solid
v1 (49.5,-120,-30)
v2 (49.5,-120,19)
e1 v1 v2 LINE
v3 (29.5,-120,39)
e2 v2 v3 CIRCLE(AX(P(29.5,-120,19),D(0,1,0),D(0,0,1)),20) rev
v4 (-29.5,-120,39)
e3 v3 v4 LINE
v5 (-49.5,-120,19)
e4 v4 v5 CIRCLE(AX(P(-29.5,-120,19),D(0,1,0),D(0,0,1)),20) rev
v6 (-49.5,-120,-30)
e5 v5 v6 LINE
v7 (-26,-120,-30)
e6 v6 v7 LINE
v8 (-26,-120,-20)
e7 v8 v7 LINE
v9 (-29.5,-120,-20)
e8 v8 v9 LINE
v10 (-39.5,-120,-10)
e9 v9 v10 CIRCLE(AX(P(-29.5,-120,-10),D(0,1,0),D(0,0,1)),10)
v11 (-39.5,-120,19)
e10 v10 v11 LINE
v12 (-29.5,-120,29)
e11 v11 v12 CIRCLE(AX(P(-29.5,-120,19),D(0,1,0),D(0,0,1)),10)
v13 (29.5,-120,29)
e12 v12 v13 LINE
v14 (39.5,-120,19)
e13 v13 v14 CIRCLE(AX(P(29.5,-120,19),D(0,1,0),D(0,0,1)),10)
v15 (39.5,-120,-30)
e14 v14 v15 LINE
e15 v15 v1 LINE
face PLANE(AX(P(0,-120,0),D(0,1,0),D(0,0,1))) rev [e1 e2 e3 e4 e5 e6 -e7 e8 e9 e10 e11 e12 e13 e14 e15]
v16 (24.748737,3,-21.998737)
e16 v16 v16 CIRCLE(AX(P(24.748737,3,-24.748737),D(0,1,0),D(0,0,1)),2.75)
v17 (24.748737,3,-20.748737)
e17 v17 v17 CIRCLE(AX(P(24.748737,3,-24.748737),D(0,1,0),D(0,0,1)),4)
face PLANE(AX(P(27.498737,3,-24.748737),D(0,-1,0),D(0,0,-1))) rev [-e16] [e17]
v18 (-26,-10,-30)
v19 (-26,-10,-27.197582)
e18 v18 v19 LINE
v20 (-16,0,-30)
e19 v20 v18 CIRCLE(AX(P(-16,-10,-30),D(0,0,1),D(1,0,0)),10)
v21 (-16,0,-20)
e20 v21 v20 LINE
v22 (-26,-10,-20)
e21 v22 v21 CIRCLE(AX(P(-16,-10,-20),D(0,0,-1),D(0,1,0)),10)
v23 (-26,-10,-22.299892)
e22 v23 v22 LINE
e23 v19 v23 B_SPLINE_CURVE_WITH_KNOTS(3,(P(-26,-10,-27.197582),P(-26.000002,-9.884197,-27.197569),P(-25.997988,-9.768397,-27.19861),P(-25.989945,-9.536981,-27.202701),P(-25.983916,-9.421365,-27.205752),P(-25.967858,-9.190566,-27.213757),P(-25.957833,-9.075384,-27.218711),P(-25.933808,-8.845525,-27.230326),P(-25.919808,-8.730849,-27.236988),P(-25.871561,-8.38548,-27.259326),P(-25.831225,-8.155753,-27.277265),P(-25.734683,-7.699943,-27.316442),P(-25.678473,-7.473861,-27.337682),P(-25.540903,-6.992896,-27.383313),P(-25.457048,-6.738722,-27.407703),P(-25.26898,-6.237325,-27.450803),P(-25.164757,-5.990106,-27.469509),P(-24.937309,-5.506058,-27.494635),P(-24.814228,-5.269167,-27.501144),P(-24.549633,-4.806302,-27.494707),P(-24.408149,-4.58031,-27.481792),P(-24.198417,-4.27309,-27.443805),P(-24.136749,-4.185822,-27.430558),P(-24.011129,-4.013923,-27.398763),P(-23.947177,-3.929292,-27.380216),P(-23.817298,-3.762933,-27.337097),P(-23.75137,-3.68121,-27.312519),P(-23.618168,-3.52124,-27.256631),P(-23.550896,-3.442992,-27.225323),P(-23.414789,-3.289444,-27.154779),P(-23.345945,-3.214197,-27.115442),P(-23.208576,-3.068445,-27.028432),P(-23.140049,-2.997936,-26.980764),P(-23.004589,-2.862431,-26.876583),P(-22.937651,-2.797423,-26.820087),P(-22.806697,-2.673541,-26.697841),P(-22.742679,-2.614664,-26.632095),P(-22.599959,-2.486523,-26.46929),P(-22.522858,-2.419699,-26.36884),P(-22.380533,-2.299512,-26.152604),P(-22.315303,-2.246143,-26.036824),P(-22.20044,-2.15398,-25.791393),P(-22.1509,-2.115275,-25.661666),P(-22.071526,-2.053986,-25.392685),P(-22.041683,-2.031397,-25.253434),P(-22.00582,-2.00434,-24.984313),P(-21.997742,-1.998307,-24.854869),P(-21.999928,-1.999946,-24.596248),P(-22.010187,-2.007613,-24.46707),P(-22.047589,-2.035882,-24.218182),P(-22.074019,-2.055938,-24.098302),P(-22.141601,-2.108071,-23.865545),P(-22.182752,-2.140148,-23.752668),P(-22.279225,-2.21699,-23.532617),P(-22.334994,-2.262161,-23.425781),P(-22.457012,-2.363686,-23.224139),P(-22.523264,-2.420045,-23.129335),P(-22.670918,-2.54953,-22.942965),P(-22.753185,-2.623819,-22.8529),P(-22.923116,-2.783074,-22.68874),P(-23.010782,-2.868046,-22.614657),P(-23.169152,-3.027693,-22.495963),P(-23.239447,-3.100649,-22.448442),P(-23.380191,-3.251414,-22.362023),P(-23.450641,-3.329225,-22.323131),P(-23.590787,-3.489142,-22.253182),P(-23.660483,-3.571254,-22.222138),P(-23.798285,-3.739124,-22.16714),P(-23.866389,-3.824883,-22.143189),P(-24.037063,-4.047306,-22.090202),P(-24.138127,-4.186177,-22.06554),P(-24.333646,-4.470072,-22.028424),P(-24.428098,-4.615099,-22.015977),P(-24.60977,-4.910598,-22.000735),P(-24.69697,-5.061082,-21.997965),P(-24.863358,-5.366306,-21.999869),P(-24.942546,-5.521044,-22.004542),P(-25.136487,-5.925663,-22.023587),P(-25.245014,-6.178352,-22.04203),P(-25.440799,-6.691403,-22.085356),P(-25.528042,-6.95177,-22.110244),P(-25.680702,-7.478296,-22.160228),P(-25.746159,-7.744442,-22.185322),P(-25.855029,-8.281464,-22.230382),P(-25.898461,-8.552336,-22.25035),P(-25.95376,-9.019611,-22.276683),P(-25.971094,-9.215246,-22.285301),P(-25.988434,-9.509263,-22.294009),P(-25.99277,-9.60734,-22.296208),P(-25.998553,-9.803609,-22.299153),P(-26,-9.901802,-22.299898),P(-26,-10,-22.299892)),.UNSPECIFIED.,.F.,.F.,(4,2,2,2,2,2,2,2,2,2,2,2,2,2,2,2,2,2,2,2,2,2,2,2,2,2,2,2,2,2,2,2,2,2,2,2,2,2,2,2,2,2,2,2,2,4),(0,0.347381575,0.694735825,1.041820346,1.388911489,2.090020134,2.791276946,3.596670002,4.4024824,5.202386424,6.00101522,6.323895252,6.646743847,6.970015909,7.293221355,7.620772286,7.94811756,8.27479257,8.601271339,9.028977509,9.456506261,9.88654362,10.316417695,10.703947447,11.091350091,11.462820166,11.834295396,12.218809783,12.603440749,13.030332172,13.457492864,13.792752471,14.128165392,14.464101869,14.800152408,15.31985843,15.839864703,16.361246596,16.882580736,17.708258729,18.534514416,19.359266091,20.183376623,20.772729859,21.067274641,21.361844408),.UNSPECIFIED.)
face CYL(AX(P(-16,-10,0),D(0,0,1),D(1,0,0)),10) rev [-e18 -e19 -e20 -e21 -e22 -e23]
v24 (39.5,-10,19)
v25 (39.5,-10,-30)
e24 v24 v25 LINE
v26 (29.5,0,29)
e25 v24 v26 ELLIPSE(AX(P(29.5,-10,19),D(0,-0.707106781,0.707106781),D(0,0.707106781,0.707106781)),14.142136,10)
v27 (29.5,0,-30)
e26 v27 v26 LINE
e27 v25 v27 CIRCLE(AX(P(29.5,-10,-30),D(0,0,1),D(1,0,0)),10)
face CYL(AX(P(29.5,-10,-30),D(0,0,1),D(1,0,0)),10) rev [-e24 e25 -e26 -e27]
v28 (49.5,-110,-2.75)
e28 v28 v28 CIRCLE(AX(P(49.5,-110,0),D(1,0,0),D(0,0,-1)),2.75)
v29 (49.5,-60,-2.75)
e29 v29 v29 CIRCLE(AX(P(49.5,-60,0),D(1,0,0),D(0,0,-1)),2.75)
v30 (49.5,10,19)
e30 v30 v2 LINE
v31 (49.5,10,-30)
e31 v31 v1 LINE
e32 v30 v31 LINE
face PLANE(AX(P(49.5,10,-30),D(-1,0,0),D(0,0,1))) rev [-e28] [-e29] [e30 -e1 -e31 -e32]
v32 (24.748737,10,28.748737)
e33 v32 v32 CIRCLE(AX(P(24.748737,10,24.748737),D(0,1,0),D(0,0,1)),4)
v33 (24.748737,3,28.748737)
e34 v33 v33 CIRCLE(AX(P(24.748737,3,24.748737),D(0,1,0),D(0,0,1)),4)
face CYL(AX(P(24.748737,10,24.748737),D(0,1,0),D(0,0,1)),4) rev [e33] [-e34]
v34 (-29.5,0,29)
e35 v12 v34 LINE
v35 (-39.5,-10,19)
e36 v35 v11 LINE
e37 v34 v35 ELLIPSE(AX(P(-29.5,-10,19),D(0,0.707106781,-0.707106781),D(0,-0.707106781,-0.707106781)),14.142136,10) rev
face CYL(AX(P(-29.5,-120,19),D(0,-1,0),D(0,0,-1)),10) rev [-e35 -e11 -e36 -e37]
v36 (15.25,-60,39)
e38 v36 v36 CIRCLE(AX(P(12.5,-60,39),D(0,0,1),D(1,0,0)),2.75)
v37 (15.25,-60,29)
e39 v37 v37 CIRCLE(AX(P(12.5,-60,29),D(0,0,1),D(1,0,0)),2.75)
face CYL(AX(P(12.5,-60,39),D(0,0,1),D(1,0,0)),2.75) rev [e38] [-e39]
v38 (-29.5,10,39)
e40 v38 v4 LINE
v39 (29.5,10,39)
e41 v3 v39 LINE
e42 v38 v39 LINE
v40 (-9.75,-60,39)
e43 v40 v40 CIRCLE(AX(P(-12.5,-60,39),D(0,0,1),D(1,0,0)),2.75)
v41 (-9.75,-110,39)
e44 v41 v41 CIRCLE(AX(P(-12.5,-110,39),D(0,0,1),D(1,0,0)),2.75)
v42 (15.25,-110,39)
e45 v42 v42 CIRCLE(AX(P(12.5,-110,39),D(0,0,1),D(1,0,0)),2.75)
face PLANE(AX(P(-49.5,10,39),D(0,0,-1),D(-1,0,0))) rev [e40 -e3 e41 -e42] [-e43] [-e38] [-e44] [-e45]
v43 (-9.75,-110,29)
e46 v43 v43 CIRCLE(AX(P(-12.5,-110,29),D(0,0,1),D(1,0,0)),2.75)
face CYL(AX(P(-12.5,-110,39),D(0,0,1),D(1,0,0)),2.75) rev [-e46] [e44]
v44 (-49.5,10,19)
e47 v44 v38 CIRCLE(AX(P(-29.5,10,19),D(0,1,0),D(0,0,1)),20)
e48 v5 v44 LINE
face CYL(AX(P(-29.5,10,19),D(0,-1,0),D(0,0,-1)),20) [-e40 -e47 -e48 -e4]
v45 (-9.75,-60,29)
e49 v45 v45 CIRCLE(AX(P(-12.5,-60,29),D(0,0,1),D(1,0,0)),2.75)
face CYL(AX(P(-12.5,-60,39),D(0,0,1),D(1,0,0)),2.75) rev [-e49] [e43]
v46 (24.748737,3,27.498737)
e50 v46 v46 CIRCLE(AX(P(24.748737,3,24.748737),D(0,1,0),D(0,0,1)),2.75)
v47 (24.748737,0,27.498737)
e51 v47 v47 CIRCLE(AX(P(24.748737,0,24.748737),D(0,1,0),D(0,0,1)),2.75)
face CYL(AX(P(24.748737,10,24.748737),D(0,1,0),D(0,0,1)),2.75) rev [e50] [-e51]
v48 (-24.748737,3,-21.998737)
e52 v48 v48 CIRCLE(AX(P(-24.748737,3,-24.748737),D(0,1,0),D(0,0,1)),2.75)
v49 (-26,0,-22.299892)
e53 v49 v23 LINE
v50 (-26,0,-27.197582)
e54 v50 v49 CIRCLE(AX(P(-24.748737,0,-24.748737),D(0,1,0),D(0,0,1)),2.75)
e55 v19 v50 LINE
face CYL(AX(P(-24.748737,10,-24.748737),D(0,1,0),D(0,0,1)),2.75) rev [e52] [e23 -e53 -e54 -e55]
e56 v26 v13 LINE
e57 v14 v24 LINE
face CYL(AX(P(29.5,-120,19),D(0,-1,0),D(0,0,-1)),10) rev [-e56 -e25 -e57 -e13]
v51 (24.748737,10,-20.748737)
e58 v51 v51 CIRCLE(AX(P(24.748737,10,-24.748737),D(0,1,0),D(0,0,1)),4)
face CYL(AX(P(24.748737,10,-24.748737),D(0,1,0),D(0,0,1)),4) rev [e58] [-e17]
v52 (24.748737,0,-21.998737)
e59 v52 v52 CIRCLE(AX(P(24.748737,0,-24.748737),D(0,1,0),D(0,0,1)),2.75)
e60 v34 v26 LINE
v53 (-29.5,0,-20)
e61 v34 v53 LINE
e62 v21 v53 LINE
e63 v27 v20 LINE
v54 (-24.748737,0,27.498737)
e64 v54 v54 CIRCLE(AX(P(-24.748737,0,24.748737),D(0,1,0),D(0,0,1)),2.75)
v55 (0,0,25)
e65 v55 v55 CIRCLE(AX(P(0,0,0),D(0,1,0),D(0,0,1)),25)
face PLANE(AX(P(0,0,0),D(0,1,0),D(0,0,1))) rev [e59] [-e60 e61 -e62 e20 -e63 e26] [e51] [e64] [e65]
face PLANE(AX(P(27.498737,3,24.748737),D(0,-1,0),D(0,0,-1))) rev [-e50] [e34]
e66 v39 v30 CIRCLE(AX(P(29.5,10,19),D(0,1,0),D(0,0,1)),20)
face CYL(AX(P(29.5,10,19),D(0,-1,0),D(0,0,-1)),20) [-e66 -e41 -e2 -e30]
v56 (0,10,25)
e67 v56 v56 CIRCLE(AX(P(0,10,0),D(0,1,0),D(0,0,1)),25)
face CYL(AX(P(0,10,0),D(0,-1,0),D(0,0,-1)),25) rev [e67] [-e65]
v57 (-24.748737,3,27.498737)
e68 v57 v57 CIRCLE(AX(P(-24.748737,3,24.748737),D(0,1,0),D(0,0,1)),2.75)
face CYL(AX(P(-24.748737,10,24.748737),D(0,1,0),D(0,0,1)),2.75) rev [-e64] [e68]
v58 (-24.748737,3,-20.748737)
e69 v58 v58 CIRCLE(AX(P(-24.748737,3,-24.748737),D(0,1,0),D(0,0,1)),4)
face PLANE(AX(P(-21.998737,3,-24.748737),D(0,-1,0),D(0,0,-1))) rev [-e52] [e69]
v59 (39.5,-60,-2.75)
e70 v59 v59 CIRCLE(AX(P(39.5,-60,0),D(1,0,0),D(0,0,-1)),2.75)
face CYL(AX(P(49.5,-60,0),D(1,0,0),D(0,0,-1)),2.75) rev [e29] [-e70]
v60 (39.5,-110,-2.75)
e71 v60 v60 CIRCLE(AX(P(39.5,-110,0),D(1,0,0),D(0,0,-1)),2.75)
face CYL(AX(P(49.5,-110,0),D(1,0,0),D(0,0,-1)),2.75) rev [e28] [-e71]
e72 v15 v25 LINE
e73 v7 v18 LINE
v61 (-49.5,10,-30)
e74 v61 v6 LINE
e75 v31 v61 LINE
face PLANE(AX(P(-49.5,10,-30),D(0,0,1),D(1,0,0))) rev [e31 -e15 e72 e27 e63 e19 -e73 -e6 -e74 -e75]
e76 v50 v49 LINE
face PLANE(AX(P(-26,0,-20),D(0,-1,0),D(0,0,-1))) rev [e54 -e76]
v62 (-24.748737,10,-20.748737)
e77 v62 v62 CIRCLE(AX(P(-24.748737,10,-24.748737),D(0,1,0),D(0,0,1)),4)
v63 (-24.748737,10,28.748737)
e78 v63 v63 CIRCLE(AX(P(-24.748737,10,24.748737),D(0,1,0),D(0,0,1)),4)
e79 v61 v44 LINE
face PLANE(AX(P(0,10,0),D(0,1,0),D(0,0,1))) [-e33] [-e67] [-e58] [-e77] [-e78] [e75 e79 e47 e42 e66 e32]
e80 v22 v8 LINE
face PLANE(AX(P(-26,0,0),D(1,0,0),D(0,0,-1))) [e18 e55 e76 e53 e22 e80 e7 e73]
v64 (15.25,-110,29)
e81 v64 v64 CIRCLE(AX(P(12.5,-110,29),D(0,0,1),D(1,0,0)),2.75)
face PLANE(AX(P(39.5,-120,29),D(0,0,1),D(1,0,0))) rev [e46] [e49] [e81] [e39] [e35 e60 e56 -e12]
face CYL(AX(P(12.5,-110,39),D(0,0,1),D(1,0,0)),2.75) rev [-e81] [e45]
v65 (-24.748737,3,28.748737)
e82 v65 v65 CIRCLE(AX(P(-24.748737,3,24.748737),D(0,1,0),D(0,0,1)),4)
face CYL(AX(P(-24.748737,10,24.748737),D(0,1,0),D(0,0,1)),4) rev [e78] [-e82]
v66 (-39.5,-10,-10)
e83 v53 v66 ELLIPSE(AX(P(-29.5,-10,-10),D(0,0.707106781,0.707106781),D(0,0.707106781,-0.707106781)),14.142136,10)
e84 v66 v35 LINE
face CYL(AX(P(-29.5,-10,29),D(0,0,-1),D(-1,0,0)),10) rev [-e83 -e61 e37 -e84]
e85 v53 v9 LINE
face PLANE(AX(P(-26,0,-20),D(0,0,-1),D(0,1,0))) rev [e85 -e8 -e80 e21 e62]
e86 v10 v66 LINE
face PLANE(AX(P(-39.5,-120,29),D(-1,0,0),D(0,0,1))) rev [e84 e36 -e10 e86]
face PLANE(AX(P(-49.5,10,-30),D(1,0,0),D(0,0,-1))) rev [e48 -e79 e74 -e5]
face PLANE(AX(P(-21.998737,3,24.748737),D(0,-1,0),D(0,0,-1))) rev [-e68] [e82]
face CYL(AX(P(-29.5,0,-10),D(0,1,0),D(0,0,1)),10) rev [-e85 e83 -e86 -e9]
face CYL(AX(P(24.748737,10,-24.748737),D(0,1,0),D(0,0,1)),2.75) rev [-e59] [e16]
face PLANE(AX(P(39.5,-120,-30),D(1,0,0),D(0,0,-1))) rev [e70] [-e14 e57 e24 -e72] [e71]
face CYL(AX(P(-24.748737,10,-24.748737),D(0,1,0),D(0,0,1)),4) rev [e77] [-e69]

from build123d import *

# Parameters (mm, degrees)
SKETCH2_W                      = 99
SKETCH2_H                      = 69
SKETCH2_R                      = 25
BOSS_EXTRUDE1_DEPTH            = 10
BOSS_EXTRUDE2_DEPTH            = 120
CBORE_FOR_M5_SHCS1_D           = 5.5
CBORE_FOR_M5_SHCS1_CBORE_D     = 8
CBORE_FOR_M5_SHCS1_CBORE_DEPTH = 7
M5_CLEARANCE_HOLE1_D           = 5.5
M5_CLEARANCE_HOLE2_D           = 5.5
M5_CLEARANCE_HOLE2_DEPTH       = 10
SKETCH11_W                     = 10
SKETCH11_H                     = 120
BOSS_EXTRUDE3_DEPTH            = 13.5
FILLET1_R                      = 20
FILLET2_R                      = 10


with BuildPart() as part:
    # Sketch2 → Boss-Extrude1 (new body)
    with BuildSketch(Plane(origin=(0, 0, 0), x_dir=(1, 0, 0), z_dir=(0, 1, 0))):
        with Locations((0, -4.5)):
            Rectangle(SKETCH2_W, SKETCH2_H)
        with Locations(Location((0, 0, 0), (0, 0, 270))):
            Circle(SKETCH2_R, mode=Mode.SUBTRACT)
    extrude(amount=BOSS_EXTRUDE1_DEPTH)

    # Sketch3 → Boss-Extrude2 (add)
    with BuildSketch(Plane.XZ):
        Polygon((-49.5, -30), (-49.5, 39), (49.5, 39), (49.5, -30), (39.5, -30), (39.5, 29), (-39.5, 29), (-39.5, -30), align=None)
    extrude(amount=BOSS_EXTRUDE2_DEPTH)

    # CBORE for M5 SHCS1 (through all)
    with Locations(Plane(origin=(0, 10, 0), x_dir=(1, 0, 0), z_dir=(0, 1, 0))):
        with Locations((24.748737342, 24.748737342), (-24.748737342, 24.748737342), (24.748737342, -24.748737342), (-24.748737342, -24.748737342)):
            CounterBoreHole(CBORE_FOR_M5_SHCS1_D / 2, CBORE_FOR_M5_SHCS1_CBORE_D / 2, CBORE_FOR_M5_SHCS1_CBORE_DEPTH)

    # M5 Clearance Hole1 (through all)
    with Locations(Plane.XY.offset(39)):
        with Locations((-12.5, -60), (12.5, -110), (-12.5, -110), (12.5, -60)):
            Hole(M5_CLEARANCE_HOLE1_D / 2)

    # M5 Clearance Hole2
    with Locations(Plane(origin=(49.5, 0, 0), x_dir=(0, 0, -1), z_dir=(1, 0, 0))):
        with Locations((0, -60), (0, -110)):
            Hole(M5_CLEARANCE_HOLE2_D / 2, depth=M5_CLEARANCE_HOLE2_DEPTH)

    # Sketch11 → Boss-Extrude3 (add)
    with BuildSketch(Plane(origin=(-39.5, 0, 0), x_dir=(0, 0, -1), z_dir=(1, 0, 0))):
        with Locations((25, -60)):
            Rectangle(SKETCH11_W, SKETCH11_H)
    extrude(amount=BOSS_EXTRUDE3_DEPTH)

    # Fillet1
    fillet1_edges = [part.edges().sort_by_distance(p)[0] for p in [
        (49.5, -55, 39),
        (-49.5, -55, 39),
    ]]
    fillet(fillet1_edges, radius=FILLET1_R)

    # Fillet2
    # the kernel refuses this fillet: 10 mm, written as the material it adds along each edge
    with BuildSketch(Plane(origin=(39.5, 0, -30), x_dir=(0, -1, 0), z_dir=(0, 0, 1))) as fillet2_piece_1:
        with BuildLine():
            CenterArc((FILLET2_R, -FILLET2_R), FILLET2_R, 90, 90)
            Line((0, -FILLET2_R), (0, 0))
            Line((0, 0), (FILLET2_R, 0))
        make_face()
    extrude(amount=59)
    with BuildSketch(Plane(origin=(-39.5, 0, 29), x_dir=(1, 0, 0), z_dir=(0, 0, -1))) as fillet2_piece_2:
        with BuildLine():
            CenterArc((FILLET2_R, FILLET2_R), FILLET2_R, 180, 90)
            Line((0, FILLET2_R), (0, 0))
            Line((0, 0), (FILLET2_R, 0))
        make_face()
    extrude(amount=49)
    with BuildSketch(Plane(origin=(-39.5, 0, 29), x_dir=(0, 0, -1), z_dir=(0, -1, 0))) as fillet2_piece_3:
        with BuildLine():
            CenterArc((FILLET2_R, FILLET2_R), FILLET2_R, 180, 90)
            Line((0, FILLET2_R), (0, 0))
            Line((0, 0), (FILLET2_R, 0))
        make_face()
    extrude(amount=120)
    with BuildSketch(Plane(origin=(39.5, 0, 29), x_dir=(0, 0, -1), z_dir=(0, -1, 0)), Plane(origin=(-39.5, -120, -20), x_dir=(1, 0, 0), z_dir=(0, 1, 0))) as fillet2_piece_4:
        with BuildLine():
            CenterArc((FILLET2_R, -FILLET2_R), FILLET2_R, 90, 90)
            Line((0, -FILLET2_R), (0, 0))
            Line((0, 0), (FILLET2_R, 0))
        make_face()
    extrude(amount=120)
    with BuildSketch(Plane(origin=(-26, 0, -2.197582327), x_dir=(1, 0, 0), z_dir=(0, 0, -1))) as fillet2_piece_5_section:
        with BuildLine():
            CenterArc((FILLET2_R, FILLET2_R), FILLET2_R, 180, 90)
            Line((0, FILLET2_R), (0, 0))
            Line((0, 0), (FILLET2_R, 0))
        make_face()
    fillet2_piece_5 = extrude(amount=27.802417673, mode=Mode.PRIVATE)
    fillet2_piece_5 = split(fillet2_piece_5, bisect_by=Plane(origin=(-18.601224516, -0.292097945, -20), z_dir=(0, 0, -1)), keep=Keep.TOP, mode=Mode.PRIVATE)
    fillet2_piece_5 = fillet2_piece_5 - Plane(origin=(-24.748737342, -0.292097945, -24.748737342), x_dir=(-1, 0, 0), z_dir=(0, -1, 0)) * Cylinder(2.75, 96, mode=Mode.PRIVATE)
    add(fillet2_piece_5)


solid = part.part
